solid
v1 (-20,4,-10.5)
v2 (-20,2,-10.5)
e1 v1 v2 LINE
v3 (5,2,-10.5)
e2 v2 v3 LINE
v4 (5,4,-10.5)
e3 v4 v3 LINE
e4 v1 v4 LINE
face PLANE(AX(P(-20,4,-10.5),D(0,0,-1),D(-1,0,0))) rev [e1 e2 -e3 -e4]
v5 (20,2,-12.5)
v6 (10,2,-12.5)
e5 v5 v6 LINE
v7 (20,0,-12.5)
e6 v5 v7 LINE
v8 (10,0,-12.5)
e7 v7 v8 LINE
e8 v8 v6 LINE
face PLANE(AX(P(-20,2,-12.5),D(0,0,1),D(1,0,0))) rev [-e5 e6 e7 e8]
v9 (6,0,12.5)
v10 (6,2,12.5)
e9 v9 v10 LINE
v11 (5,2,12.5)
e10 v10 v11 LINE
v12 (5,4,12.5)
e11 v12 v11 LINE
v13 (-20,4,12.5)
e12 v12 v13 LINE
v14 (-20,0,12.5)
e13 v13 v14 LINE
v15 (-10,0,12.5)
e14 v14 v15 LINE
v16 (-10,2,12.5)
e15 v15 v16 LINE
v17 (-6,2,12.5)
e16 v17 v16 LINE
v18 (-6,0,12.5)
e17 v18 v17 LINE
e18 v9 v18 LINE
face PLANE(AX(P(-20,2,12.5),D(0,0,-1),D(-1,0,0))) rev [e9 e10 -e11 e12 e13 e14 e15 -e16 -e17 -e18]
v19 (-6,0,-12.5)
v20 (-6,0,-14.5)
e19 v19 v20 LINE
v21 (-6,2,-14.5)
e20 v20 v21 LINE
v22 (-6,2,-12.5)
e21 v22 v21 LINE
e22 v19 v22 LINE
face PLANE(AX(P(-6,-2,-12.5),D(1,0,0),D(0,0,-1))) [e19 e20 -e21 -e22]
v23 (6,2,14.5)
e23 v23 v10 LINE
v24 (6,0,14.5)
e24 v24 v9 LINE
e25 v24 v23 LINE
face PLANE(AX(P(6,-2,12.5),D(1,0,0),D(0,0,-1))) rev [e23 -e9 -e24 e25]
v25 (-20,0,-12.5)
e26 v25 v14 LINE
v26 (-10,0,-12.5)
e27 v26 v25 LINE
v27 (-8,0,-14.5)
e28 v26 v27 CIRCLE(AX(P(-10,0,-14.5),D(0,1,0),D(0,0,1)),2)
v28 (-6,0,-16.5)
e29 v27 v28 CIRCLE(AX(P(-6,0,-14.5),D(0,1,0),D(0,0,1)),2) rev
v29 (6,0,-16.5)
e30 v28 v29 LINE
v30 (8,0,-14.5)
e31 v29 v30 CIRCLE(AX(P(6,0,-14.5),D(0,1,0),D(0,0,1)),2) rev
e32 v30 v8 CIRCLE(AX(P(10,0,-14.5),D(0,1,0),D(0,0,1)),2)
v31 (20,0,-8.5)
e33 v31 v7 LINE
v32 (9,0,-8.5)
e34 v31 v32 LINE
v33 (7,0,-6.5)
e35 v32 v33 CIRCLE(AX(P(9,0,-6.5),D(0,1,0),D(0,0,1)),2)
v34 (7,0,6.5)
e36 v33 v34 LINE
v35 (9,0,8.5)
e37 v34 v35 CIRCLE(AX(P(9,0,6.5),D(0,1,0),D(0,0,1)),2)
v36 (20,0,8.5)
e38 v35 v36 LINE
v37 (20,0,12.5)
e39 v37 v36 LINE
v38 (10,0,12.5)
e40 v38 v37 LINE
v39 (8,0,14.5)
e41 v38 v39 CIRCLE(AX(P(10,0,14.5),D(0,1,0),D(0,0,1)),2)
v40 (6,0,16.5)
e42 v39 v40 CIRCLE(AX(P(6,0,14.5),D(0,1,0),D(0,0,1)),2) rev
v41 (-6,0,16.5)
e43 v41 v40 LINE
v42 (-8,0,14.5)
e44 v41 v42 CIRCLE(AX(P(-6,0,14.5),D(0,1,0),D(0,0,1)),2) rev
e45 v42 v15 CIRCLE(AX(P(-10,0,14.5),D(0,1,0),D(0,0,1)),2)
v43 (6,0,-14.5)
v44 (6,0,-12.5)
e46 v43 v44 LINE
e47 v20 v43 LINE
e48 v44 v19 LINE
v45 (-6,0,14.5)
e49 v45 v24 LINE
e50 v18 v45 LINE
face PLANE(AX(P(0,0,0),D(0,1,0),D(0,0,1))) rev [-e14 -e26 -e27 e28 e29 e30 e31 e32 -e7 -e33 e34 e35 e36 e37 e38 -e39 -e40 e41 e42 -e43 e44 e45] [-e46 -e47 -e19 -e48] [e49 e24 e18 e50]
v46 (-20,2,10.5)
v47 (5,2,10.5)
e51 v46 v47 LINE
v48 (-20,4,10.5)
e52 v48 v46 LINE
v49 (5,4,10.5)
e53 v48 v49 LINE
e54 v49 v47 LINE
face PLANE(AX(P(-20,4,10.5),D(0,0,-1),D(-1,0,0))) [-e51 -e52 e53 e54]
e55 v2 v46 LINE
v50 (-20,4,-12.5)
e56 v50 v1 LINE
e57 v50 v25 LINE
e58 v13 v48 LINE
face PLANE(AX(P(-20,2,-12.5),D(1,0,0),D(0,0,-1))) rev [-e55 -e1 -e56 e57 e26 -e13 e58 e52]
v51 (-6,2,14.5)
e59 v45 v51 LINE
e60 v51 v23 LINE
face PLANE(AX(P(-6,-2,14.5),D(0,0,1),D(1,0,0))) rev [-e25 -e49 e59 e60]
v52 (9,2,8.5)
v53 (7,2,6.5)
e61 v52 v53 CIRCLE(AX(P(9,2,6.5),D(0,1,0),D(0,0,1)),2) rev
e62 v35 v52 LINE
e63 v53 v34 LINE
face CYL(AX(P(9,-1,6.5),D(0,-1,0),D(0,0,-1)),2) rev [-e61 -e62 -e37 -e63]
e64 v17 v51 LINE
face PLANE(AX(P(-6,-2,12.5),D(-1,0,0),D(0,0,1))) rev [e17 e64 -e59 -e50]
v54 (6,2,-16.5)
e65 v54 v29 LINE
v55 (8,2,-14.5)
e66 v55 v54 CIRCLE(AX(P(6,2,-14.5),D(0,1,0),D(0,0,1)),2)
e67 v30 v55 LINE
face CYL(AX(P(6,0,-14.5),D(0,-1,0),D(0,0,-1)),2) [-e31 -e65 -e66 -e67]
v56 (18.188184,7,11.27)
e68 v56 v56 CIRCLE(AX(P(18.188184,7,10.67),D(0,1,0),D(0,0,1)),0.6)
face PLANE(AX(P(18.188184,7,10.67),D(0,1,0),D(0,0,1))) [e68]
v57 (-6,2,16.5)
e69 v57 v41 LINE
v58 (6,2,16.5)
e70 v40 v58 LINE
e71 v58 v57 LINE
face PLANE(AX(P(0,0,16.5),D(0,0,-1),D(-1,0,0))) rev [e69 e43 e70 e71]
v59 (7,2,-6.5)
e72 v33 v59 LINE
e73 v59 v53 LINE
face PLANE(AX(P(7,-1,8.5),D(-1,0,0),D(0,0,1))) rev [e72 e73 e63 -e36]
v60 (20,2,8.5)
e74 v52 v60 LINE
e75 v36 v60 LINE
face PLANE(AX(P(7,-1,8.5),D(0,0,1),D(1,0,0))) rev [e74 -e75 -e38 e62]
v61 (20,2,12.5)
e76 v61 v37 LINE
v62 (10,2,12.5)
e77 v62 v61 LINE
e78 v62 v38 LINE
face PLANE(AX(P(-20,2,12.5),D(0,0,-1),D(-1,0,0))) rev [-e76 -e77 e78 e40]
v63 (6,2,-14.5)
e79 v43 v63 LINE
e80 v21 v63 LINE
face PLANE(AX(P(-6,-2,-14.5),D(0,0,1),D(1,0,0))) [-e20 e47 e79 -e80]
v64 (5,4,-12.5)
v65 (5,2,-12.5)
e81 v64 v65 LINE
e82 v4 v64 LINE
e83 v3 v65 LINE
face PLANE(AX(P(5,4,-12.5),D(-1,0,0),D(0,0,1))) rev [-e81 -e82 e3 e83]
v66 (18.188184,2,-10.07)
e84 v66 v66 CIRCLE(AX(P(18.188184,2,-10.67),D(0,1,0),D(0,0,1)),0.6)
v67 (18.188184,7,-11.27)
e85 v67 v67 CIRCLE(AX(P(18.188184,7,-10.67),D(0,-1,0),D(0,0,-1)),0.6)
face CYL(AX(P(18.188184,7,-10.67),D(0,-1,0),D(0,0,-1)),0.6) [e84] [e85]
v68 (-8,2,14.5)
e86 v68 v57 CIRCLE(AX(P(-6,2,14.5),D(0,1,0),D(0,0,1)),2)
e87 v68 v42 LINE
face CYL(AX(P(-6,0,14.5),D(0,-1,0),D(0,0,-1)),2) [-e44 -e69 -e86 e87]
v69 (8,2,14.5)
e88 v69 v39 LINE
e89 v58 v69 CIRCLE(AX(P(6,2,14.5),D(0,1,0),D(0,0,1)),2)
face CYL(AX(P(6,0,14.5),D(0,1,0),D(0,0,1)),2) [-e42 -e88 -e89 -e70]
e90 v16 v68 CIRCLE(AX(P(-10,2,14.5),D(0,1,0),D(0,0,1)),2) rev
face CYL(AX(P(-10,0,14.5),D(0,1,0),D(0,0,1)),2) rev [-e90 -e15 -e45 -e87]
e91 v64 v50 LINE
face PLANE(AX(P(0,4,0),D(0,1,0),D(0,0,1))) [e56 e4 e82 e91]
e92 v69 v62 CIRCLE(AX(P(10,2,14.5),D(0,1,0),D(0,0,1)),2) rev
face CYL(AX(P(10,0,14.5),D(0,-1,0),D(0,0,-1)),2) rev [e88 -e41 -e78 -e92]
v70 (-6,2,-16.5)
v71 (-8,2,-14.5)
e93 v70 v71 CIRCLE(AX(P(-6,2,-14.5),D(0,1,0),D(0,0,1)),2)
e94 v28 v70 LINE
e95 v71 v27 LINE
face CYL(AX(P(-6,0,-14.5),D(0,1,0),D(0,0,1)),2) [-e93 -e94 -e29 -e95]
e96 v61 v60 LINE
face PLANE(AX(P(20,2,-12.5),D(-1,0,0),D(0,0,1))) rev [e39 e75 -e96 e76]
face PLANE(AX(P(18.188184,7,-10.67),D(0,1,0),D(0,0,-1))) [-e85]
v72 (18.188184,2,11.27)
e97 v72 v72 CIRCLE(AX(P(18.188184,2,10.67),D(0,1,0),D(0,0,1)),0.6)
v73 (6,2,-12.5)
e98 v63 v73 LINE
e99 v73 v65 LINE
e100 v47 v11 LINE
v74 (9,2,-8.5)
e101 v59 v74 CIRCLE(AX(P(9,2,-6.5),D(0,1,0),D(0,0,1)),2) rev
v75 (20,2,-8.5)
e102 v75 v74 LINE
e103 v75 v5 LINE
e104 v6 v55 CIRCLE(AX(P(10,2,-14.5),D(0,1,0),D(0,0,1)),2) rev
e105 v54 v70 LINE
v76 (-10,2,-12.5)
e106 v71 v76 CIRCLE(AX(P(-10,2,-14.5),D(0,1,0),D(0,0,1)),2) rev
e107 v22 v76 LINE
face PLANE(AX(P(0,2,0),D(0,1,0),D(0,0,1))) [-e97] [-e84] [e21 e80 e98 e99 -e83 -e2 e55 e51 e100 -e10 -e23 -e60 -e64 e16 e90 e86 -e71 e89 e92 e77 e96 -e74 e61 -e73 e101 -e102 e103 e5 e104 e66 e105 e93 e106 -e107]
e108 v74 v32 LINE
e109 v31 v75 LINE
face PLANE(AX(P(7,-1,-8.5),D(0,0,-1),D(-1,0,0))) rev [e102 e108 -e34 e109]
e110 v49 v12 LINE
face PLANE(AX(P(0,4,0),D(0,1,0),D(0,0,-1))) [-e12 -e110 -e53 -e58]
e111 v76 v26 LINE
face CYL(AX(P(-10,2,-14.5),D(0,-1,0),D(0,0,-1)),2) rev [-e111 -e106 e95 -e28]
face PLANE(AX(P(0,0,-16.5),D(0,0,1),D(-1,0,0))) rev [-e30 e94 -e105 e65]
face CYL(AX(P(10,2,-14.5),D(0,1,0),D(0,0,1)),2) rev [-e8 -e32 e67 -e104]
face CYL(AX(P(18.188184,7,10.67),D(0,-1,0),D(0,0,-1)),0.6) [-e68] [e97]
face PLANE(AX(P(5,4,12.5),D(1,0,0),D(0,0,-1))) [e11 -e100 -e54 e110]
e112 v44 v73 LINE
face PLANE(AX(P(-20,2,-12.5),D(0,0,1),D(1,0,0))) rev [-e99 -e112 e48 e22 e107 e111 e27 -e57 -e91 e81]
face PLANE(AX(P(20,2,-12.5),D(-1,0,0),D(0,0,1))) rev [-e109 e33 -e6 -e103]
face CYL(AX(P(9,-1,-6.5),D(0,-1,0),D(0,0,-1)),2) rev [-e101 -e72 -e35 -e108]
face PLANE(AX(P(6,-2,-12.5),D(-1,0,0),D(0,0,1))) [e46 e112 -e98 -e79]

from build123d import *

# Parameters (mm, degrees)
SKETCH1_W           = 40
SKETCH1_H           = 25
BOSS_EXTRUDE1_DEPTH = 2
SKETCH2_W           = 25
SKETCH2_H           = 2
BOSS_EXTRUDE2_DEPTH = 2
SKETCH3_W           = 13
SKETCH3_H           = 17
CUT_EXTRUDE1_DEPTH  = 3
SKETCH4_R           = 0.6
BOSS_EXTRUDE3_DEPTH = 5
SKETCH5_W           = 16
SKETCH5_H           = 2
BOSS_EXTRUDE4_DEPTH = 4
SKETCH6_W           = 12
SKETCH6_H           = 2
CUT_EXTRUDE2_DEPTH  = 4
FILLET1_START       = -1
FILLET1_DEPTH       = 4
FILLET1_2_DEPTH     = 2
MIRROR4_DEPTH       = 2
FILLET2_R           = 2
FILLET3_R           = 2


with BuildPart() as part:
    # Sketch1 → Boss-Extrude1 (new body)
    with BuildSketch(Plane(origin=(0, 0, 0), x_dir=(1, 0, 0), z_dir=(0, 1, 0))):
        Rectangle(SKETCH1_W, SKETCH1_H)
    extrude(amount=BOSS_EXTRUDE1_DEPTH)

    # Sketch2 → Boss-Extrude2 (add)
    with BuildSketch(Plane(origin=(0, 2, 0), x_dir=(1, 0, 0), z_dir=(0, 1, 0))):
        with Locations((-7.5, 11.5)):
            Rectangle(SKETCH2_W, SKETCH2_H)
    boss_extrude2 = extrude(amount=BOSS_EXTRUDE2_DEPTH)

    # Mirror1: Boss-Extrude2 across plane
    add(boss_extrude2.mirror(Plane.XY))

    # Sketch3 → Cut-Extrude1 (cut)
    with BuildSketch(Plane(origin=(0, 2, 0), x_dir=(1, 0, 0), z_dir=(0, 1, 0))):
        with Locations((13.5, 0)):
            Rectangle(SKETCH3_W, SKETCH3_H)
    extrude(amount=-CUT_EXTRUDE1_DEPTH, mode=Mode.SUBTRACT)

    # Sketch4 → Boss-Extrude3 (add)
    with BuildSketch(Plane(origin=(0, 2, 0), x_dir=(1, 0, 0), z_dir=(0, 1, 0))):
        with Locations(Location((18.188184095, -10.67, 0), (0, 0, 270))):
            Circle(SKETCH4_R)
    boss_extrude3 = extrude(amount=BOSS_EXTRUDE3_DEPTH)

    # Mirror2: Boss-Extrude3 across plane
    add(boss_extrude3.mirror(Plane.XY))

    # Sketch5 → Boss-Extrude4 (add)
    with BuildSketch(Plane.XY.offset(12.5)):
        with Locations((0, 1)):
            Rectangle(SKETCH5_W, SKETCH5_H)
    extrude(amount=BOSS_EXTRUDE4_DEPTH)

    # Sketch6 → Cut-Extrude2 (cut)
    with BuildSketch(Plane(origin=(0, 2, 0), x_dir=(1, 0, 0), z_dir=(0, 1, 0))):
        with Locations((0, -13.5)):
            Rectangle(SKETCH6_W, SKETCH6_H)
    extrude(amount=-CUT_EXTRUDE2_DEPTH, mode=Mode.SUBTRACT)

    # Fillet1: read off the stored shape, not the designer's step
    # Fillet1 outline → Fillet1 (cut)
    with BuildSketch(Plane(origin=(0, 0, 0), x_dir=(1, 0, 0), z_dir=(0, 1, 0)).offset(FILLET1_START)):
        with BuildLine():
            ThreePointArc((8, -14.5), (7.414213562, -15.914213562), (6, -16.5))
            Line((6, -16.5), (8, -16.5))
            Line((8, -16.5), (8, -14.5))
        make_face()
        with BuildLine():
            Line((-8, -16.5), (-6, -16.5))
            ThreePointArc((-6, -16.5), (-7.414213562, -15.914213562), (-8, -14.5))
            Line((-8, -14.5), (-8, -16.5))
        make_face()
    extrude(amount=FILLET1_DEPTH, mode=Mode.SUBTRACT)

    # Fillet1 2 outline → Fillet1 2 (add)
    with BuildSketch(Plane(origin=(0, 0, 0), x_dir=(1, 0, 0), z_dir=(0, 1, 0))):
        with BuildLine():
            Line((8, -12.5), (8, -14.5))
            ThreePointArc((8, -14.5), (8.585786438, -13.085786438), (10, -12.5))
            Line((10, -12.5), (8, -12.5))
        make_face()
        with BuildLine():
            ThreePointArc((-10, -12.5), (-8.585786438, -13.085786438), (-8, -14.5))
            Line((-8, -14.5), (-8, -12.5))
            Line((-8, -12.5), (-10, -12.5))
        make_face()
    extrude(amount=FILLET1_2_DEPTH)

    # Mirror4: read off the stored shape, not the designer's step
    # Mirror4 outline → Mirror4 (add)
    with BuildSketch(Plane(origin=(0, 0, 0), x_dir=(1, 0, 0), z_dir=(0, 1, 0))):
        with BuildLine():
            Line((-8, 12.5), (-6, 12.5))
            Line((-6, 12.5), (-6, 14.5))
            Line((-6, 14.5), (6, 14.5))
            Line((6, 14.5), (6, 12.5))
            Line((6, 12.5), (8, 12.5))
            Line((8, 12.5), (8, 14.5))
            ThreePointArc((8, 14.5), (7.414213562, 15.914213562), (6, 16.5))
            Line((6, 16.5), (-6, 16.5))
            ThreePointArc((-6, 16.5), (-7.414213562, 15.914213562), (-8, 14.5))
            Line((-8, 14.5), (-8, 12.5))
        make_face()
    extrude(amount=MIRROR4_DEPTH)

    # Fillet2
    # the kernel refuses this fillet: 2 mm, written as the material it adds along each edge
    with BuildSketch(Plane(origin=(-8, 0, -12.5), x_dir=(-1, 0, 0), z_dir=(0, 1, 0))) as fillet2_piece_1:
        with BuildLine():
            CenterArc((FILLET2_R, -FILLET2_R), FILLET2_R, 90, 90)
            Line((0, -FILLET2_R), (0, 0))
            Line((0, 0), (FILLET2_R, 0))
        make_face()
    extrude(amount=2)
    with BuildSketch(Plane(origin=(8, 0, -12.5), x_dir=(1, 0, 0), z_dir=(0, 1, 0))) as fillet2_piece_2:
        with BuildLine():
            CenterArc((FILLET2_R, FILLET2_R), FILLET2_R, 180, 90)
            Line((0, FILLET2_R), (0, 0))
            Line((0, 0), (FILLET2_R, 0))
        make_face()
    extrude(amount=2)

    # Fillet3
    fillet3_edges = [part.edges().sort_by_distance(p)[0] for p in [
        (7, 1, 8.5),
        (7, 1, -8.5),
    ]]
    fillet(fillet3_edges, radius=FILLET3_R)


solid = part.part
